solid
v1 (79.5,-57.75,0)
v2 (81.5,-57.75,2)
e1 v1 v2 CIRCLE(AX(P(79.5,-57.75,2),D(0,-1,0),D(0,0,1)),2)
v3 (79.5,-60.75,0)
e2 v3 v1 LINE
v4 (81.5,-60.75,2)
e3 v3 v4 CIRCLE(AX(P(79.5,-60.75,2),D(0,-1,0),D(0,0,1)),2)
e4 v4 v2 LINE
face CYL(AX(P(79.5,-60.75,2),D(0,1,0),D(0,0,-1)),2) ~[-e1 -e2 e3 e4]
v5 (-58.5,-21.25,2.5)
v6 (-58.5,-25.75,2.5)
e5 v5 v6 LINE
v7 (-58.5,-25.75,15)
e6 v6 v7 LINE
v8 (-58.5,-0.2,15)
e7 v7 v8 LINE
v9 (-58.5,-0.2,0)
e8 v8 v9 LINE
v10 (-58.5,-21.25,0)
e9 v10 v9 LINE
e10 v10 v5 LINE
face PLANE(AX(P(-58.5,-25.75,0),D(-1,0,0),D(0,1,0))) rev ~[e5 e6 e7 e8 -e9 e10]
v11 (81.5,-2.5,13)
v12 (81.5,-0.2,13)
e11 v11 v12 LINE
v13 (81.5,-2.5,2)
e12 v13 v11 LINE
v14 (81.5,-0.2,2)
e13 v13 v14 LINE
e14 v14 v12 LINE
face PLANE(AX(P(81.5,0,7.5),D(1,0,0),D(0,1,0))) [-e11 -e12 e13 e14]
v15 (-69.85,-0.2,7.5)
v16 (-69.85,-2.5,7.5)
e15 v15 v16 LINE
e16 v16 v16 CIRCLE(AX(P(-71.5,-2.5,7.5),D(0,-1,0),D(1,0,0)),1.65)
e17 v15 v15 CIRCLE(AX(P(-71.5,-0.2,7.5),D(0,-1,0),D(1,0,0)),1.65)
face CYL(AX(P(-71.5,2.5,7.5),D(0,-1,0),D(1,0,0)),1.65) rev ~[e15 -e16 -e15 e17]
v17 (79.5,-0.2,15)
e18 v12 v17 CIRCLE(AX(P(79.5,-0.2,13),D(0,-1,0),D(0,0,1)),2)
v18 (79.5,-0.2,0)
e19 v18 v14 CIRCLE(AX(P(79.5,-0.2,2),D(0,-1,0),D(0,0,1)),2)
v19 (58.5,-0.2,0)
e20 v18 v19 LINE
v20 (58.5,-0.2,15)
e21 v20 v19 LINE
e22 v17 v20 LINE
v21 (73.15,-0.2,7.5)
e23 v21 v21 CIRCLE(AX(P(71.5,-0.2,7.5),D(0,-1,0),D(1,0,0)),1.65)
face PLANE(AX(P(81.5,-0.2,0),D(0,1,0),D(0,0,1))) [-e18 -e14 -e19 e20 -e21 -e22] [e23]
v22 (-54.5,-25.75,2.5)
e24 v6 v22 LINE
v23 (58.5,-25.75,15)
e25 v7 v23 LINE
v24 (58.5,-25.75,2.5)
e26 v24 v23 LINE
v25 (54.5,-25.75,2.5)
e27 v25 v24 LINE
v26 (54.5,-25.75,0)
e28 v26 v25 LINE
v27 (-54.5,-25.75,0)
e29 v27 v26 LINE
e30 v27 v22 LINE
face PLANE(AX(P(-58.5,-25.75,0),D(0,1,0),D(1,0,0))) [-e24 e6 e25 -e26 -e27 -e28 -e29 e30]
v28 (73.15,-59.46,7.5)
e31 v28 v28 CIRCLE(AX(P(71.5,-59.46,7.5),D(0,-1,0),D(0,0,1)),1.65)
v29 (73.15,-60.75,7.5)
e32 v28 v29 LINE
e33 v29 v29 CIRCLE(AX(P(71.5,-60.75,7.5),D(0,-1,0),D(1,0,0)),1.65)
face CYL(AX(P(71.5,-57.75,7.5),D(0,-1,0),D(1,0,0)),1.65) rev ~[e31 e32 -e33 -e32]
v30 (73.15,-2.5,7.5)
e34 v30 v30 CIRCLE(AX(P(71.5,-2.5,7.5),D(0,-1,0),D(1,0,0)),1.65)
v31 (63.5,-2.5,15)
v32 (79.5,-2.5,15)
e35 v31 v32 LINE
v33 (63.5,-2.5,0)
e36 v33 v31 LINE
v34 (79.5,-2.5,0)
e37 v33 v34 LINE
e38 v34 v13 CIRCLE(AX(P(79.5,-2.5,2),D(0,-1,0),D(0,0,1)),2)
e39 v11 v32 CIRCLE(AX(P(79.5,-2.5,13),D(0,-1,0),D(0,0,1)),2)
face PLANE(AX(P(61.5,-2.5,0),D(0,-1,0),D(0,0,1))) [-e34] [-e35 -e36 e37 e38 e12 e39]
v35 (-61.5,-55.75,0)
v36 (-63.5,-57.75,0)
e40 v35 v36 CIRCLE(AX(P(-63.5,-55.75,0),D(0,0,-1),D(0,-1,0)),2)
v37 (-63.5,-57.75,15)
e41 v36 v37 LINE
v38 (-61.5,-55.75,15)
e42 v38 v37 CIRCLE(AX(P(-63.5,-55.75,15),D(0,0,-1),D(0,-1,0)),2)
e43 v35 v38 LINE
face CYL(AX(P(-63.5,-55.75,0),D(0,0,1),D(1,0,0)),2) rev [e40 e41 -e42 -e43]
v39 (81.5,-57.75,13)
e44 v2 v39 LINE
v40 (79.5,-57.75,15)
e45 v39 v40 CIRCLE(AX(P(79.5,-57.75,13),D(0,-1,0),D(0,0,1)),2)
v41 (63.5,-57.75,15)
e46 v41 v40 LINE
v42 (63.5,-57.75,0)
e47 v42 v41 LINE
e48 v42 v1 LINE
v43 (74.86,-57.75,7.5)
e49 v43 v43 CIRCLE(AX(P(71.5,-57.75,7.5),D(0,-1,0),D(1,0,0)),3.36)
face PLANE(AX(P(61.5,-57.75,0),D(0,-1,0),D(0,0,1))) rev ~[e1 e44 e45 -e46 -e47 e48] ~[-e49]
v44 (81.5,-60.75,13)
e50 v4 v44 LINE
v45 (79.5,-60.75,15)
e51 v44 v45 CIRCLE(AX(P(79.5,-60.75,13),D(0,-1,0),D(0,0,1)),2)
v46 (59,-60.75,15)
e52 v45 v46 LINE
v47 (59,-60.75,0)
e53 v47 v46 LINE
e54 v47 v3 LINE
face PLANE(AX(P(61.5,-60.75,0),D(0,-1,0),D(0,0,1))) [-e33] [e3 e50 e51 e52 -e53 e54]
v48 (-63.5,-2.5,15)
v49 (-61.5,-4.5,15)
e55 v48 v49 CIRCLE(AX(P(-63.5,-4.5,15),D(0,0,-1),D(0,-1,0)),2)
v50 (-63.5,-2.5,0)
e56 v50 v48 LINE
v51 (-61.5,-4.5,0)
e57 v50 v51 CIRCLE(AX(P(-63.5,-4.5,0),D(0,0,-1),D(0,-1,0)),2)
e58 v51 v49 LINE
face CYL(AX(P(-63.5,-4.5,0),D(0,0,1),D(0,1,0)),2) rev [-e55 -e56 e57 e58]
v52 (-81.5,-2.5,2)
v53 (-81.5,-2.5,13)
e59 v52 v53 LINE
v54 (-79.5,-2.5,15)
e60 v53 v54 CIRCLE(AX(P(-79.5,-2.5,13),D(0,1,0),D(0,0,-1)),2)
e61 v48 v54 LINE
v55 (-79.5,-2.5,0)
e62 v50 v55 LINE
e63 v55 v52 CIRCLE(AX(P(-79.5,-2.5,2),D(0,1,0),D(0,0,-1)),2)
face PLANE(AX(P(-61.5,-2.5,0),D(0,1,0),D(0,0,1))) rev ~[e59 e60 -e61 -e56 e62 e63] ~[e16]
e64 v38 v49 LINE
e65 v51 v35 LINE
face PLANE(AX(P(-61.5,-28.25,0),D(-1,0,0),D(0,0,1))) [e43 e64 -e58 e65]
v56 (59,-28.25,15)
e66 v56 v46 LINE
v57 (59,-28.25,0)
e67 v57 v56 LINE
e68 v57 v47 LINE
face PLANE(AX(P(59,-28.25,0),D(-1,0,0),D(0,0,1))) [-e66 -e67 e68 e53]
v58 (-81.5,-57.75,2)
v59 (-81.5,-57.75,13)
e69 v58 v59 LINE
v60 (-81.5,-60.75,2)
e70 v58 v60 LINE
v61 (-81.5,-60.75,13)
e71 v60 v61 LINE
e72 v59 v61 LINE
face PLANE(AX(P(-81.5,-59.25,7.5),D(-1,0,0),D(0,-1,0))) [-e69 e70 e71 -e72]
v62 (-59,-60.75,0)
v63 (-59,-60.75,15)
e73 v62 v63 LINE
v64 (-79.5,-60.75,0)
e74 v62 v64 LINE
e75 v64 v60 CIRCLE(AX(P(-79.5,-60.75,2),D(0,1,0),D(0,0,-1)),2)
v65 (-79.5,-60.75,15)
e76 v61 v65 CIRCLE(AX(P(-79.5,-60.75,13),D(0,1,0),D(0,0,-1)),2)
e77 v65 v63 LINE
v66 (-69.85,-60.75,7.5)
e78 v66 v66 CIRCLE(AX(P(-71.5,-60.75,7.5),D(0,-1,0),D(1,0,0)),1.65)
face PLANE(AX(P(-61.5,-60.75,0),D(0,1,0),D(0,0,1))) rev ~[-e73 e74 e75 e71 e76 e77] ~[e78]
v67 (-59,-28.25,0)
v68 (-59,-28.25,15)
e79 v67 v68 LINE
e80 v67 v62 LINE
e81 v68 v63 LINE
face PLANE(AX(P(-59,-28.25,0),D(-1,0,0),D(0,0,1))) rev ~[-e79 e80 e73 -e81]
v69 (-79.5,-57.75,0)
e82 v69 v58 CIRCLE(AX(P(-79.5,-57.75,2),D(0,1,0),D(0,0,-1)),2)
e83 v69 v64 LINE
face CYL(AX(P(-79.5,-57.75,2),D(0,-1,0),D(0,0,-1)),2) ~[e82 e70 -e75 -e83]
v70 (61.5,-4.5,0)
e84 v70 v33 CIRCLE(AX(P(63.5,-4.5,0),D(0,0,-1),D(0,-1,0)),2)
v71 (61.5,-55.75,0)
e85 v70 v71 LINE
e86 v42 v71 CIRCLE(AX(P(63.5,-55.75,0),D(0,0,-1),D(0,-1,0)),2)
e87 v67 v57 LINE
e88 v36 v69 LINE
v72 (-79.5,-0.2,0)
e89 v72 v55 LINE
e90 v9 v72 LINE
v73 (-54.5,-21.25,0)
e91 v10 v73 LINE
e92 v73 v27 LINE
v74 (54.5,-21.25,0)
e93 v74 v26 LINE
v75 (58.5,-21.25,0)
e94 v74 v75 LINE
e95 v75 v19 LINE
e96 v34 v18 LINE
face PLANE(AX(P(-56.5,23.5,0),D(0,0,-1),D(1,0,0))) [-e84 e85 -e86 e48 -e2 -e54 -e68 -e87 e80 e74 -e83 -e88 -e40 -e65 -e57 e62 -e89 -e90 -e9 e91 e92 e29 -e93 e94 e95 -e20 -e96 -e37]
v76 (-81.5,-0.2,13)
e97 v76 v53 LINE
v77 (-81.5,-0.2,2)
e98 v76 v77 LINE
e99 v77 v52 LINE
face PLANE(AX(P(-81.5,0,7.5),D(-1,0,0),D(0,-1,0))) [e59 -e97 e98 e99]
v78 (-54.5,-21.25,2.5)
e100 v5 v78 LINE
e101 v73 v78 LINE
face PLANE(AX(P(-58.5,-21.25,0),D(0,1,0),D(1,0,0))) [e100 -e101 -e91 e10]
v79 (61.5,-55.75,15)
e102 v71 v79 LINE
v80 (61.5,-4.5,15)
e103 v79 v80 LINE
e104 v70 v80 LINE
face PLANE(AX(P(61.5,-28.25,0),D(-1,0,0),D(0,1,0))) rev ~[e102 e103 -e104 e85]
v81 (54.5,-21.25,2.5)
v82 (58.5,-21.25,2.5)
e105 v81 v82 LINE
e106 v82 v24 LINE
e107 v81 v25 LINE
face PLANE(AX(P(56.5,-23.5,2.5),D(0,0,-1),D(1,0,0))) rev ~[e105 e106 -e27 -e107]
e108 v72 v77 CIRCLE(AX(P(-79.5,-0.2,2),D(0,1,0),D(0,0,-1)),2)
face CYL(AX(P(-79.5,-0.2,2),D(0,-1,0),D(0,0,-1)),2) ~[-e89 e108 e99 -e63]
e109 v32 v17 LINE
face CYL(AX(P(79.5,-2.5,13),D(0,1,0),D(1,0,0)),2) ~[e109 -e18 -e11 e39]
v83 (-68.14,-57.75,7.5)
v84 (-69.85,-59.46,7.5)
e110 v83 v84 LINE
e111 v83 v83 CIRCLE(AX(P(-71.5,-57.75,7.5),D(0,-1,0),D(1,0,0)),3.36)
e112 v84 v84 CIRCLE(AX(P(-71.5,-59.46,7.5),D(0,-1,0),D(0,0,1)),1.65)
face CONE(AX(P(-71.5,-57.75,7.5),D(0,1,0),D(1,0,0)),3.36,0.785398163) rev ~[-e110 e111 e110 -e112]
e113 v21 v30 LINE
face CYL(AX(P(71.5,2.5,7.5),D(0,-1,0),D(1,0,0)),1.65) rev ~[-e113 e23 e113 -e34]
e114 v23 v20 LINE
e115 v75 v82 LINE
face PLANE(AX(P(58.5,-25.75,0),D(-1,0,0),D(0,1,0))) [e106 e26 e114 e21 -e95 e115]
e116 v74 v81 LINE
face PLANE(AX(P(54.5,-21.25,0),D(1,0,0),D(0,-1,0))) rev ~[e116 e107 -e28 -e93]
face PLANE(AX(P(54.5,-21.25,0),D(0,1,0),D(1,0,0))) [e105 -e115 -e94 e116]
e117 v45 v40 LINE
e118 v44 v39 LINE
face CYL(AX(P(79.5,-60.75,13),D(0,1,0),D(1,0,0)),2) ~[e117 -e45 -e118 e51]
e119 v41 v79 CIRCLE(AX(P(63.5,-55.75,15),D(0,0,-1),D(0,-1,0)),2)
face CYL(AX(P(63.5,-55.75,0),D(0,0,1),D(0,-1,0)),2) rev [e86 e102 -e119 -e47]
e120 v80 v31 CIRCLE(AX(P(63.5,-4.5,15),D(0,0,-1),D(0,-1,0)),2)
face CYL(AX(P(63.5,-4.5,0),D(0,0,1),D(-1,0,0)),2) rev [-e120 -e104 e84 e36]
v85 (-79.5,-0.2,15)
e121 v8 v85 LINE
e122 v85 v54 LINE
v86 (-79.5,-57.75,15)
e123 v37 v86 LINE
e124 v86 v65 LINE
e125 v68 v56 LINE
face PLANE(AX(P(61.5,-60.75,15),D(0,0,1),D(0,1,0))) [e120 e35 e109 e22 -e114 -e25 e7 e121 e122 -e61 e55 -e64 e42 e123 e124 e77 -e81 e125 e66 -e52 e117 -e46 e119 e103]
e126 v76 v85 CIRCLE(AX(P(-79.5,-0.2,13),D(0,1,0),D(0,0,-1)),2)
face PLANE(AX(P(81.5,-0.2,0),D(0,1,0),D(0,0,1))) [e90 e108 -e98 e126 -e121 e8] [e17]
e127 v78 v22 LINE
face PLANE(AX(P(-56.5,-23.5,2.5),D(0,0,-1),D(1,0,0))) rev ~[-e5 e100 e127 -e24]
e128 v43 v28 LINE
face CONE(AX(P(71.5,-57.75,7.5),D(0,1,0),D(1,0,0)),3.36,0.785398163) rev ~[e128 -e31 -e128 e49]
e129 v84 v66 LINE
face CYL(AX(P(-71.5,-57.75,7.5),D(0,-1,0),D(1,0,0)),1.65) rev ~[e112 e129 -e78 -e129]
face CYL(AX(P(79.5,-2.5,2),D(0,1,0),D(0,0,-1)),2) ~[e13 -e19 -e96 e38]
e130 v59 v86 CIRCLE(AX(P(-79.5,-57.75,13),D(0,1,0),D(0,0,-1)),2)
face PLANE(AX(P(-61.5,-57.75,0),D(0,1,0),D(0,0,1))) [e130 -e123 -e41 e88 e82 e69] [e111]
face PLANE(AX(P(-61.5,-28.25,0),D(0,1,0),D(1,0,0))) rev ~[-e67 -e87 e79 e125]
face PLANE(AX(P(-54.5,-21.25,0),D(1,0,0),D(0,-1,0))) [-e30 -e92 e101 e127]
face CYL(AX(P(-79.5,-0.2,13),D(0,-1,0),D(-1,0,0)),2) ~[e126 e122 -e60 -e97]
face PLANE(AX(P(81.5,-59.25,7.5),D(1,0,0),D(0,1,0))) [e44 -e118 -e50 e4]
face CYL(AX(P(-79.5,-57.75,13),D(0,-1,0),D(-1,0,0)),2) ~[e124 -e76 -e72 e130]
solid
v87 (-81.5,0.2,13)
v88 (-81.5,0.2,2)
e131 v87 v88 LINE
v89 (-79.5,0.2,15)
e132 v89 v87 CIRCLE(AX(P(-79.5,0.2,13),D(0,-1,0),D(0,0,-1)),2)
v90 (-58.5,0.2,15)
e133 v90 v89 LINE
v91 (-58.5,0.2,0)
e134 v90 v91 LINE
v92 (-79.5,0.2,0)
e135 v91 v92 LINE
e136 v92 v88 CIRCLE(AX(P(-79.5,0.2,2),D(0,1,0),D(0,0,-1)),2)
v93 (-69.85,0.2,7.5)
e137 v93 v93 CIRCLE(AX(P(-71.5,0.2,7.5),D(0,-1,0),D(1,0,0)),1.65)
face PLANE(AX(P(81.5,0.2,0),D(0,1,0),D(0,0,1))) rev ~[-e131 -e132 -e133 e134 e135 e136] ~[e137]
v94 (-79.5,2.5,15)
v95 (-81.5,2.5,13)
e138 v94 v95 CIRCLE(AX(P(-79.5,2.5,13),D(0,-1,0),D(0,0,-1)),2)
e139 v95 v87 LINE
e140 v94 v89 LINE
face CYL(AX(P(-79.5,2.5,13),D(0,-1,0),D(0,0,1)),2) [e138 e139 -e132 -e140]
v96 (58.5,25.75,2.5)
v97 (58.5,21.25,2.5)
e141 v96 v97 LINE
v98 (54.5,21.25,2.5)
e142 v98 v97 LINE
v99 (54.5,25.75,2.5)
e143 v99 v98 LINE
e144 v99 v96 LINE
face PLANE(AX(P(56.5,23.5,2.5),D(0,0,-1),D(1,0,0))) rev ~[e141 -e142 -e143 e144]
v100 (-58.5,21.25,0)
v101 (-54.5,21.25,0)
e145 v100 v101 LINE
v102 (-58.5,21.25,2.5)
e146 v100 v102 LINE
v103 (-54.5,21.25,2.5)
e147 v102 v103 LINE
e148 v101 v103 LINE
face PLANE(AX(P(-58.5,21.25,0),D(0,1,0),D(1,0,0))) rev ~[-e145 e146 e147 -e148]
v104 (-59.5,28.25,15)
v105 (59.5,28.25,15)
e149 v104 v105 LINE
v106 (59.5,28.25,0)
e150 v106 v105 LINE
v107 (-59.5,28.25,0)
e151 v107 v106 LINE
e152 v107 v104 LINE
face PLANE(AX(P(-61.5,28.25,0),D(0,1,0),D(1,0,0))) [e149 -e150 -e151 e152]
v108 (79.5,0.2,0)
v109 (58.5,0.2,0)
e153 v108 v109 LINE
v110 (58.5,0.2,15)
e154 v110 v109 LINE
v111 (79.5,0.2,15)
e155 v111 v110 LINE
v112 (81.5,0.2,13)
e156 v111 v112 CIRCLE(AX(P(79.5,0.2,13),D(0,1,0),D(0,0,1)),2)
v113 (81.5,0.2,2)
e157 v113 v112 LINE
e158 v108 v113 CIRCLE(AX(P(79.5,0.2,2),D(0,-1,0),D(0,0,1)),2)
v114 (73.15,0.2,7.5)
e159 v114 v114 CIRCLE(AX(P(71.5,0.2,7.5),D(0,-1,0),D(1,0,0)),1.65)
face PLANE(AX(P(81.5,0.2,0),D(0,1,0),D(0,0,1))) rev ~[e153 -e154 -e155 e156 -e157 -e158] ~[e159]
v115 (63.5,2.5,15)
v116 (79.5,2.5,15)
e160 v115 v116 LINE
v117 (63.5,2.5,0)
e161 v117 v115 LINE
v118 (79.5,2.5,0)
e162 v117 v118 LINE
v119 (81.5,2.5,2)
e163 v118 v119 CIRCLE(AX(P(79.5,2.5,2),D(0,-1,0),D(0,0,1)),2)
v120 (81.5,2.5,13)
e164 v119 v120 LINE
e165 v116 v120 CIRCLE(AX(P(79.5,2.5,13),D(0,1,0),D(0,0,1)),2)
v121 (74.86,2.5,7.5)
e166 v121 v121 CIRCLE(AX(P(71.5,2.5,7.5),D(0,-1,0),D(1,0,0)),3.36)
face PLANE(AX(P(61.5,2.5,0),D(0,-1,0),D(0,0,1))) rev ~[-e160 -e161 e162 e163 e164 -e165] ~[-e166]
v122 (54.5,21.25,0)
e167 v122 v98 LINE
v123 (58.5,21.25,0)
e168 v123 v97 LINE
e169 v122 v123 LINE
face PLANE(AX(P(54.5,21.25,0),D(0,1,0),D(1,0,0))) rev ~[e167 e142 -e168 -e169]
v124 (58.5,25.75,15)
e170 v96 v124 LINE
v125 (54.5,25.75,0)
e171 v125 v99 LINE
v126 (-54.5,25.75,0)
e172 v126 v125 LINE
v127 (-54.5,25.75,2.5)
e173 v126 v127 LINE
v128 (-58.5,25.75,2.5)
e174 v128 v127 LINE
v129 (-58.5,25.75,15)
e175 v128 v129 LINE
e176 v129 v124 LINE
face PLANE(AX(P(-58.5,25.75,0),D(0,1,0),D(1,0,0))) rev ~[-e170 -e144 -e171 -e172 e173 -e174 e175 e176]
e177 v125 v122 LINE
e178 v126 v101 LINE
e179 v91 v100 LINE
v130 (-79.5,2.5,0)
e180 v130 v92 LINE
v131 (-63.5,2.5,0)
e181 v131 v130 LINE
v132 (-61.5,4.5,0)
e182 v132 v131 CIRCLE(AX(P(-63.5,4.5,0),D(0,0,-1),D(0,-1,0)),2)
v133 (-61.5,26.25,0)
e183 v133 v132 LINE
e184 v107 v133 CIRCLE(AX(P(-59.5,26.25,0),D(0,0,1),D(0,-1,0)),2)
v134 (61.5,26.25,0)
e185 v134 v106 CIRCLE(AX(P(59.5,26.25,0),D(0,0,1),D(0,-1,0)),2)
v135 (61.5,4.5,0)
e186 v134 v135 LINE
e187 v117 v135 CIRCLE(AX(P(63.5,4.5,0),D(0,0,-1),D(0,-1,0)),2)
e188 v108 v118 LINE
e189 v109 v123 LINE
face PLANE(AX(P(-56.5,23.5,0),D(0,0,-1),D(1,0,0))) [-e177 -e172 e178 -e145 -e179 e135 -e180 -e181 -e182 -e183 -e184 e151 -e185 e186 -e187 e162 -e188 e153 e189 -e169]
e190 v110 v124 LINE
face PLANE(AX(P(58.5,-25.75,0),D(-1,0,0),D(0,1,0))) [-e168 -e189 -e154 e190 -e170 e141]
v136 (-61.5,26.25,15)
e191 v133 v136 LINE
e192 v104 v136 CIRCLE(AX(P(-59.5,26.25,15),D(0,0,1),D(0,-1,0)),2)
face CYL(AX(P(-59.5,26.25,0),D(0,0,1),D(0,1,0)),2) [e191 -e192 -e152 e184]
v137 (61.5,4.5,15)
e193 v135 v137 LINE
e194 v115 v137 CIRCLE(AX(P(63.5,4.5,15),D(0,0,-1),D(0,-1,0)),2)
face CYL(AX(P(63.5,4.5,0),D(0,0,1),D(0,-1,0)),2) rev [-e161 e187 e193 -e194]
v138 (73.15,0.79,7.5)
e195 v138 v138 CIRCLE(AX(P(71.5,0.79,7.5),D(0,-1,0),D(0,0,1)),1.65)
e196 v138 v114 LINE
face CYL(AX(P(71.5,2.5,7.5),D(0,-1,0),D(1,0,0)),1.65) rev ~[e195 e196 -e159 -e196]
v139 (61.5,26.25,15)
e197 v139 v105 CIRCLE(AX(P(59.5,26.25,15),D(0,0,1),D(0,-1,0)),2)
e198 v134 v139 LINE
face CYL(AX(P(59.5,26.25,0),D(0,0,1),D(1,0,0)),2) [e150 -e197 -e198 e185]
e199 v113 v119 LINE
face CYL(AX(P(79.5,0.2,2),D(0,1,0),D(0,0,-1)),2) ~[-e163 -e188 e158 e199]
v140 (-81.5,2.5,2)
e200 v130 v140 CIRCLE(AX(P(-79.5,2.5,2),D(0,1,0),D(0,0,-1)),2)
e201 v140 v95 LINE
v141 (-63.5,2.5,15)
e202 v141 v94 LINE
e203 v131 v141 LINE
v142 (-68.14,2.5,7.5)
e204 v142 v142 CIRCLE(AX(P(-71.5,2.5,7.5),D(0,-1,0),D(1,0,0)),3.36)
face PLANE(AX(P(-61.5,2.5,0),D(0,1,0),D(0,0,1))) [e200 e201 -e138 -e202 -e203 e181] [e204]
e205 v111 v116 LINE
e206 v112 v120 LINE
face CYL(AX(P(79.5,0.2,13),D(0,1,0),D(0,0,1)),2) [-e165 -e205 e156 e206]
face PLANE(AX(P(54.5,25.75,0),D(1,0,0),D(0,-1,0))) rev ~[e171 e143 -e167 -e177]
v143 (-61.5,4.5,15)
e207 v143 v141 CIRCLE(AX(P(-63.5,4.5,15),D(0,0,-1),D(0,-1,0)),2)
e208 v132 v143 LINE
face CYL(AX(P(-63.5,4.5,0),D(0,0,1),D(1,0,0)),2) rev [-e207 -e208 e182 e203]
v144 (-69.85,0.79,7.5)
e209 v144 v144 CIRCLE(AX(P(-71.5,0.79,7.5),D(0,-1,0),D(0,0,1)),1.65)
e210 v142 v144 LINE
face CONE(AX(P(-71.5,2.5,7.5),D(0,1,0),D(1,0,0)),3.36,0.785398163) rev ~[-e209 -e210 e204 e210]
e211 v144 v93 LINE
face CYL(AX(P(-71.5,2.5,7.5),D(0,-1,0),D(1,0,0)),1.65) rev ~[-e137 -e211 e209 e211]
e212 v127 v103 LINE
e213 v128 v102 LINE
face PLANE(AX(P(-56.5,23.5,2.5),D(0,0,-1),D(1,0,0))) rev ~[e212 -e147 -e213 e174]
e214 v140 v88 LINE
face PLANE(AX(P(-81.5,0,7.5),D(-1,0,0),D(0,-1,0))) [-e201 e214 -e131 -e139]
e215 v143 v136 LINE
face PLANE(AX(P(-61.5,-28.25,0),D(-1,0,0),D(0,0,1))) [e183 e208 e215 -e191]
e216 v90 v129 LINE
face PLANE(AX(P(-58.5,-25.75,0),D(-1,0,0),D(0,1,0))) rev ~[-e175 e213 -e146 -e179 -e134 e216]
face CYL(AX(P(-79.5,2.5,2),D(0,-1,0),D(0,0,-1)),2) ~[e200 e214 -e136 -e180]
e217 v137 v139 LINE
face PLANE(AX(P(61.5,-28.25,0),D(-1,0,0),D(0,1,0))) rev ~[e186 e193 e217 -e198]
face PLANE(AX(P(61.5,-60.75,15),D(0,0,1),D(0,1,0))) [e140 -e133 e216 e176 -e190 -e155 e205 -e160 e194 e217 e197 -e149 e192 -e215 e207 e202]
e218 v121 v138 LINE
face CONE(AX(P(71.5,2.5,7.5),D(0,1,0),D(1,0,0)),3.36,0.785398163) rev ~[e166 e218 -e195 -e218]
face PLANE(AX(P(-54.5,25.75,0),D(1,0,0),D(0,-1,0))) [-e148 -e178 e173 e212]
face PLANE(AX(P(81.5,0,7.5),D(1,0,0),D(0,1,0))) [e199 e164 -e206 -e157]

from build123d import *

# Parameters (mm, degrees)
F0_W            = 123
F0_H            = 56.5
F0_W_2          = 117
F0_H_2          = 51.5
F1_DEPTH        = 15
F3_W            = 2.5
F3_H            = 15
F4_DEPTH        = 32.5
F5_W            = 3
F5_H            = 15
F6_DEPTH        = 20
F7_W            = 3
F7_H            = 15
F8_DEPTH        = 20
F10_D           = 3.3
F10_DEPTH       = 5
F10_CSINK_D     = 6.72
F10_CSINK_ANGLE = 90
F10_TIP         = 0.9914200214
F12_D           = 3.3
F12_DEPTH       = 5
F12_CSINK_D     = 6.72
F12_CSINK_ANGLE = 90
F12_TIP         = 0.9914200214
F13_W           = 4
F13_H           = 4.5
F14_DEPTH       = 2.5
F15_W           = 5
F15_H           = 15
F16_DEPTH       = 20
F18_D           = 3.3
F18_CSINK_D     = 6.72
F18_CSINK_ANGLE = 90
F19_W           = 5
F19_H           = 15
F20_DEPTH       = 20
F22_D           = 3.3
F22_CSINK_D     = 6.72
F22_CSINK_ANGLE = 90
F23_W           = 0.4
F23_H           = 15
F24_DEPTH       = 200
F25_R           = 2


with BuildPart() as f1:
    # F0 (on Top) → F1 (new body)
    with BuildSketch(Plane.XY):
        Rectangle(F0_W, F0_H)
        Rectangle(F0_W_2, F0_H_2, mode=Mode.SUBTRACT)
    extrude(amount=F1_DEPTH)

    # F3 (on face) → F4 (join)
    with BuildSketch(Plane.XZ.offset(28.25)):
        with Locations((-60.25, 7.5)):
            Rectangle(F3_W, F3_H)
        with Locations((60.25, 7.5)):
            Rectangle(F3_W, F3_H)
    extrude(amount=F4_DEPTH)

    # F5 (on face) → F6 (join)
    with BuildSketch(Plane(origin=(-61.5, 0, 0), x_dir=(0, -1, 0), z_dir=(-1, 0, 0))):
        with Locations((59.25, 7.5)):
            Rectangle(F5_W, F5_H)
    extrude(amount=F6_DEPTH)

    # F7 (on face) → F8 (join)
    with BuildSketch(Plane.YZ.offset(61.5)):
        with Locations((-59.25, 7.5)):
            Rectangle(F7_W, F7_H)
    extrude(amount=F8_DEPTH)

    # F10
    with Locations(Plane(origin=(0, -57.75, 0), x_dir=(-1, 0, 0), z_dir=(0, 1, 0))):
        with Locations((-71.5, 7.5)):
            CounterSinkHole(F10_D / 2, F10_CSINK_D / 2, depth=F10_DEPTH, counter_sink_angle=F10_CSINK_ANGLE)
            with Locations((0, 0, -(F10_DEPTH + F10_TIP / 2))):  # 118° drill point
                Cone(0, F10_D / 2, F10_TIP, mode=Mode.SUBTRACT)

    # F12
    with Locations(Plane(origin=(0, -57.75, 0), x_dir=(-1, 0, 0), z_dir=(0, 1, 0))):
        with Locations((71.5, 7.5)):
            CounterSinkHole(F12_D / 2, F12_CSINK_D / 2, depth=F12_DEPTH, counter_sink_angle=F12_CSINK_ANGLE)
            with Locations((0, 0, -(F12_DEPTH + F12_TIP / 2))):  # 118° drill point
                Cone(0, F12_D / 2, F12_TIP, mode=Mode.SUBTRACT)

    # F13 (on face) → F14 (join)
    with BuildSketch(Plane(origin=(0, 0, 0), x_dir=(1, 0, 0), z_dir=(0, 0, -1))):
        with Locations((-56.5, -23.5)):
            Rectangle(F13_W, F13_H)
        with Locations((-56.5, 23.5)):
            Rectangle(F13_W, F13_H)
        with Locations((56.5, 23.5)):
            Rectangle(F13_W, F13_H)
        with Locations((56.5, -23.5)):
            Rectangle(F13_W, F13_H)
    extrude(amount=-F14_DEPTH)

    # F15 (on face) → F16 (join)
    with BuildSketch(Plane(origin=(-61.5, 0, 0), x_dir=(0, -1, 0), z_dir=(-1, 0, 0))):
        with Locations((0, 7.5)):
            Rectangle(F15_W, F15_H)
    extrude(amount=F16_DEPTH)

    # F18 (through all)
    with Locations(Plane(origin=(0, 2.5, 0), x_dir=(-1, 0, 0), z_dir=(0, 1, 0))):
        with Locations((71.5, 7.5)):
            CounterSinkHole(F18_D / 2, F18_CSINK_D / 2, counter_sink_angle=F18_CSINK_ANGLE)

    # F19 (on face) → F20 (join)
    with BuildSketch(Plane.YZ.offset(61.5)):
        with Locations((0, 7.5)):
            Rectangle(F19_W, F19_H)
    extrude(amount=F20_DEPTH)

    # F22 (through all)
    with Locations(Plane(origin=(0, 2.5, 0), x_dir=(-1, 0, 0), z_dir=(0, 1, 0))):
        with Locations((-71.5, 7.5)):
            CounterSinkHole(F22_D / 2, F22_CSINK_D / 2, counter_sink_angle=F22_CSINK_ANGLE)

    # F23 (on face) → F24 (cut)
    with BuildSketch(Plane.YZ.offset(81.5)):
        with Locations((0, 7.5)):
            Rectangle(F23_W, F23_H)
    extrude(amount=-F24_DEPTH, mode=Mode.SUBTRACT)

    # F25
    f25_edges = [f1.edges().sort_by_distance(p)[0] for p in [
        (-61.5, 28.25, 7.5),
        (-81.5, -1.35, 0),
        (-81.5, 1.35, 0),
        (-81.5, -59.25, 15),
        (81.5, -59.25, 0),
        (81.5, -1.35, 15),
        (81.5, 1.35, 15),
        (61.5, 28.25, 7.5),
        (-61.5, -57.75, 7.5),
        (61.5, -57.75, 7.5),
        (81.5, -1.35, 0),
        (81.5, 1.35, 0),
        (-81.5, -1.35, 15),
        (-81.5, 1.35, 15),
        (-61.5, 2.5, 7.5),
        (-61.5, -2.5, 7.5),
        (61.5, 2.5, 7.5),
        (61.5, -2.5, 7.5),
        (-81.5, -59.25, 0),
        (81.5, -59.25, 15),
    ]]
    fillet(f25_edges, radius=F25_R)


solid = f1.part
